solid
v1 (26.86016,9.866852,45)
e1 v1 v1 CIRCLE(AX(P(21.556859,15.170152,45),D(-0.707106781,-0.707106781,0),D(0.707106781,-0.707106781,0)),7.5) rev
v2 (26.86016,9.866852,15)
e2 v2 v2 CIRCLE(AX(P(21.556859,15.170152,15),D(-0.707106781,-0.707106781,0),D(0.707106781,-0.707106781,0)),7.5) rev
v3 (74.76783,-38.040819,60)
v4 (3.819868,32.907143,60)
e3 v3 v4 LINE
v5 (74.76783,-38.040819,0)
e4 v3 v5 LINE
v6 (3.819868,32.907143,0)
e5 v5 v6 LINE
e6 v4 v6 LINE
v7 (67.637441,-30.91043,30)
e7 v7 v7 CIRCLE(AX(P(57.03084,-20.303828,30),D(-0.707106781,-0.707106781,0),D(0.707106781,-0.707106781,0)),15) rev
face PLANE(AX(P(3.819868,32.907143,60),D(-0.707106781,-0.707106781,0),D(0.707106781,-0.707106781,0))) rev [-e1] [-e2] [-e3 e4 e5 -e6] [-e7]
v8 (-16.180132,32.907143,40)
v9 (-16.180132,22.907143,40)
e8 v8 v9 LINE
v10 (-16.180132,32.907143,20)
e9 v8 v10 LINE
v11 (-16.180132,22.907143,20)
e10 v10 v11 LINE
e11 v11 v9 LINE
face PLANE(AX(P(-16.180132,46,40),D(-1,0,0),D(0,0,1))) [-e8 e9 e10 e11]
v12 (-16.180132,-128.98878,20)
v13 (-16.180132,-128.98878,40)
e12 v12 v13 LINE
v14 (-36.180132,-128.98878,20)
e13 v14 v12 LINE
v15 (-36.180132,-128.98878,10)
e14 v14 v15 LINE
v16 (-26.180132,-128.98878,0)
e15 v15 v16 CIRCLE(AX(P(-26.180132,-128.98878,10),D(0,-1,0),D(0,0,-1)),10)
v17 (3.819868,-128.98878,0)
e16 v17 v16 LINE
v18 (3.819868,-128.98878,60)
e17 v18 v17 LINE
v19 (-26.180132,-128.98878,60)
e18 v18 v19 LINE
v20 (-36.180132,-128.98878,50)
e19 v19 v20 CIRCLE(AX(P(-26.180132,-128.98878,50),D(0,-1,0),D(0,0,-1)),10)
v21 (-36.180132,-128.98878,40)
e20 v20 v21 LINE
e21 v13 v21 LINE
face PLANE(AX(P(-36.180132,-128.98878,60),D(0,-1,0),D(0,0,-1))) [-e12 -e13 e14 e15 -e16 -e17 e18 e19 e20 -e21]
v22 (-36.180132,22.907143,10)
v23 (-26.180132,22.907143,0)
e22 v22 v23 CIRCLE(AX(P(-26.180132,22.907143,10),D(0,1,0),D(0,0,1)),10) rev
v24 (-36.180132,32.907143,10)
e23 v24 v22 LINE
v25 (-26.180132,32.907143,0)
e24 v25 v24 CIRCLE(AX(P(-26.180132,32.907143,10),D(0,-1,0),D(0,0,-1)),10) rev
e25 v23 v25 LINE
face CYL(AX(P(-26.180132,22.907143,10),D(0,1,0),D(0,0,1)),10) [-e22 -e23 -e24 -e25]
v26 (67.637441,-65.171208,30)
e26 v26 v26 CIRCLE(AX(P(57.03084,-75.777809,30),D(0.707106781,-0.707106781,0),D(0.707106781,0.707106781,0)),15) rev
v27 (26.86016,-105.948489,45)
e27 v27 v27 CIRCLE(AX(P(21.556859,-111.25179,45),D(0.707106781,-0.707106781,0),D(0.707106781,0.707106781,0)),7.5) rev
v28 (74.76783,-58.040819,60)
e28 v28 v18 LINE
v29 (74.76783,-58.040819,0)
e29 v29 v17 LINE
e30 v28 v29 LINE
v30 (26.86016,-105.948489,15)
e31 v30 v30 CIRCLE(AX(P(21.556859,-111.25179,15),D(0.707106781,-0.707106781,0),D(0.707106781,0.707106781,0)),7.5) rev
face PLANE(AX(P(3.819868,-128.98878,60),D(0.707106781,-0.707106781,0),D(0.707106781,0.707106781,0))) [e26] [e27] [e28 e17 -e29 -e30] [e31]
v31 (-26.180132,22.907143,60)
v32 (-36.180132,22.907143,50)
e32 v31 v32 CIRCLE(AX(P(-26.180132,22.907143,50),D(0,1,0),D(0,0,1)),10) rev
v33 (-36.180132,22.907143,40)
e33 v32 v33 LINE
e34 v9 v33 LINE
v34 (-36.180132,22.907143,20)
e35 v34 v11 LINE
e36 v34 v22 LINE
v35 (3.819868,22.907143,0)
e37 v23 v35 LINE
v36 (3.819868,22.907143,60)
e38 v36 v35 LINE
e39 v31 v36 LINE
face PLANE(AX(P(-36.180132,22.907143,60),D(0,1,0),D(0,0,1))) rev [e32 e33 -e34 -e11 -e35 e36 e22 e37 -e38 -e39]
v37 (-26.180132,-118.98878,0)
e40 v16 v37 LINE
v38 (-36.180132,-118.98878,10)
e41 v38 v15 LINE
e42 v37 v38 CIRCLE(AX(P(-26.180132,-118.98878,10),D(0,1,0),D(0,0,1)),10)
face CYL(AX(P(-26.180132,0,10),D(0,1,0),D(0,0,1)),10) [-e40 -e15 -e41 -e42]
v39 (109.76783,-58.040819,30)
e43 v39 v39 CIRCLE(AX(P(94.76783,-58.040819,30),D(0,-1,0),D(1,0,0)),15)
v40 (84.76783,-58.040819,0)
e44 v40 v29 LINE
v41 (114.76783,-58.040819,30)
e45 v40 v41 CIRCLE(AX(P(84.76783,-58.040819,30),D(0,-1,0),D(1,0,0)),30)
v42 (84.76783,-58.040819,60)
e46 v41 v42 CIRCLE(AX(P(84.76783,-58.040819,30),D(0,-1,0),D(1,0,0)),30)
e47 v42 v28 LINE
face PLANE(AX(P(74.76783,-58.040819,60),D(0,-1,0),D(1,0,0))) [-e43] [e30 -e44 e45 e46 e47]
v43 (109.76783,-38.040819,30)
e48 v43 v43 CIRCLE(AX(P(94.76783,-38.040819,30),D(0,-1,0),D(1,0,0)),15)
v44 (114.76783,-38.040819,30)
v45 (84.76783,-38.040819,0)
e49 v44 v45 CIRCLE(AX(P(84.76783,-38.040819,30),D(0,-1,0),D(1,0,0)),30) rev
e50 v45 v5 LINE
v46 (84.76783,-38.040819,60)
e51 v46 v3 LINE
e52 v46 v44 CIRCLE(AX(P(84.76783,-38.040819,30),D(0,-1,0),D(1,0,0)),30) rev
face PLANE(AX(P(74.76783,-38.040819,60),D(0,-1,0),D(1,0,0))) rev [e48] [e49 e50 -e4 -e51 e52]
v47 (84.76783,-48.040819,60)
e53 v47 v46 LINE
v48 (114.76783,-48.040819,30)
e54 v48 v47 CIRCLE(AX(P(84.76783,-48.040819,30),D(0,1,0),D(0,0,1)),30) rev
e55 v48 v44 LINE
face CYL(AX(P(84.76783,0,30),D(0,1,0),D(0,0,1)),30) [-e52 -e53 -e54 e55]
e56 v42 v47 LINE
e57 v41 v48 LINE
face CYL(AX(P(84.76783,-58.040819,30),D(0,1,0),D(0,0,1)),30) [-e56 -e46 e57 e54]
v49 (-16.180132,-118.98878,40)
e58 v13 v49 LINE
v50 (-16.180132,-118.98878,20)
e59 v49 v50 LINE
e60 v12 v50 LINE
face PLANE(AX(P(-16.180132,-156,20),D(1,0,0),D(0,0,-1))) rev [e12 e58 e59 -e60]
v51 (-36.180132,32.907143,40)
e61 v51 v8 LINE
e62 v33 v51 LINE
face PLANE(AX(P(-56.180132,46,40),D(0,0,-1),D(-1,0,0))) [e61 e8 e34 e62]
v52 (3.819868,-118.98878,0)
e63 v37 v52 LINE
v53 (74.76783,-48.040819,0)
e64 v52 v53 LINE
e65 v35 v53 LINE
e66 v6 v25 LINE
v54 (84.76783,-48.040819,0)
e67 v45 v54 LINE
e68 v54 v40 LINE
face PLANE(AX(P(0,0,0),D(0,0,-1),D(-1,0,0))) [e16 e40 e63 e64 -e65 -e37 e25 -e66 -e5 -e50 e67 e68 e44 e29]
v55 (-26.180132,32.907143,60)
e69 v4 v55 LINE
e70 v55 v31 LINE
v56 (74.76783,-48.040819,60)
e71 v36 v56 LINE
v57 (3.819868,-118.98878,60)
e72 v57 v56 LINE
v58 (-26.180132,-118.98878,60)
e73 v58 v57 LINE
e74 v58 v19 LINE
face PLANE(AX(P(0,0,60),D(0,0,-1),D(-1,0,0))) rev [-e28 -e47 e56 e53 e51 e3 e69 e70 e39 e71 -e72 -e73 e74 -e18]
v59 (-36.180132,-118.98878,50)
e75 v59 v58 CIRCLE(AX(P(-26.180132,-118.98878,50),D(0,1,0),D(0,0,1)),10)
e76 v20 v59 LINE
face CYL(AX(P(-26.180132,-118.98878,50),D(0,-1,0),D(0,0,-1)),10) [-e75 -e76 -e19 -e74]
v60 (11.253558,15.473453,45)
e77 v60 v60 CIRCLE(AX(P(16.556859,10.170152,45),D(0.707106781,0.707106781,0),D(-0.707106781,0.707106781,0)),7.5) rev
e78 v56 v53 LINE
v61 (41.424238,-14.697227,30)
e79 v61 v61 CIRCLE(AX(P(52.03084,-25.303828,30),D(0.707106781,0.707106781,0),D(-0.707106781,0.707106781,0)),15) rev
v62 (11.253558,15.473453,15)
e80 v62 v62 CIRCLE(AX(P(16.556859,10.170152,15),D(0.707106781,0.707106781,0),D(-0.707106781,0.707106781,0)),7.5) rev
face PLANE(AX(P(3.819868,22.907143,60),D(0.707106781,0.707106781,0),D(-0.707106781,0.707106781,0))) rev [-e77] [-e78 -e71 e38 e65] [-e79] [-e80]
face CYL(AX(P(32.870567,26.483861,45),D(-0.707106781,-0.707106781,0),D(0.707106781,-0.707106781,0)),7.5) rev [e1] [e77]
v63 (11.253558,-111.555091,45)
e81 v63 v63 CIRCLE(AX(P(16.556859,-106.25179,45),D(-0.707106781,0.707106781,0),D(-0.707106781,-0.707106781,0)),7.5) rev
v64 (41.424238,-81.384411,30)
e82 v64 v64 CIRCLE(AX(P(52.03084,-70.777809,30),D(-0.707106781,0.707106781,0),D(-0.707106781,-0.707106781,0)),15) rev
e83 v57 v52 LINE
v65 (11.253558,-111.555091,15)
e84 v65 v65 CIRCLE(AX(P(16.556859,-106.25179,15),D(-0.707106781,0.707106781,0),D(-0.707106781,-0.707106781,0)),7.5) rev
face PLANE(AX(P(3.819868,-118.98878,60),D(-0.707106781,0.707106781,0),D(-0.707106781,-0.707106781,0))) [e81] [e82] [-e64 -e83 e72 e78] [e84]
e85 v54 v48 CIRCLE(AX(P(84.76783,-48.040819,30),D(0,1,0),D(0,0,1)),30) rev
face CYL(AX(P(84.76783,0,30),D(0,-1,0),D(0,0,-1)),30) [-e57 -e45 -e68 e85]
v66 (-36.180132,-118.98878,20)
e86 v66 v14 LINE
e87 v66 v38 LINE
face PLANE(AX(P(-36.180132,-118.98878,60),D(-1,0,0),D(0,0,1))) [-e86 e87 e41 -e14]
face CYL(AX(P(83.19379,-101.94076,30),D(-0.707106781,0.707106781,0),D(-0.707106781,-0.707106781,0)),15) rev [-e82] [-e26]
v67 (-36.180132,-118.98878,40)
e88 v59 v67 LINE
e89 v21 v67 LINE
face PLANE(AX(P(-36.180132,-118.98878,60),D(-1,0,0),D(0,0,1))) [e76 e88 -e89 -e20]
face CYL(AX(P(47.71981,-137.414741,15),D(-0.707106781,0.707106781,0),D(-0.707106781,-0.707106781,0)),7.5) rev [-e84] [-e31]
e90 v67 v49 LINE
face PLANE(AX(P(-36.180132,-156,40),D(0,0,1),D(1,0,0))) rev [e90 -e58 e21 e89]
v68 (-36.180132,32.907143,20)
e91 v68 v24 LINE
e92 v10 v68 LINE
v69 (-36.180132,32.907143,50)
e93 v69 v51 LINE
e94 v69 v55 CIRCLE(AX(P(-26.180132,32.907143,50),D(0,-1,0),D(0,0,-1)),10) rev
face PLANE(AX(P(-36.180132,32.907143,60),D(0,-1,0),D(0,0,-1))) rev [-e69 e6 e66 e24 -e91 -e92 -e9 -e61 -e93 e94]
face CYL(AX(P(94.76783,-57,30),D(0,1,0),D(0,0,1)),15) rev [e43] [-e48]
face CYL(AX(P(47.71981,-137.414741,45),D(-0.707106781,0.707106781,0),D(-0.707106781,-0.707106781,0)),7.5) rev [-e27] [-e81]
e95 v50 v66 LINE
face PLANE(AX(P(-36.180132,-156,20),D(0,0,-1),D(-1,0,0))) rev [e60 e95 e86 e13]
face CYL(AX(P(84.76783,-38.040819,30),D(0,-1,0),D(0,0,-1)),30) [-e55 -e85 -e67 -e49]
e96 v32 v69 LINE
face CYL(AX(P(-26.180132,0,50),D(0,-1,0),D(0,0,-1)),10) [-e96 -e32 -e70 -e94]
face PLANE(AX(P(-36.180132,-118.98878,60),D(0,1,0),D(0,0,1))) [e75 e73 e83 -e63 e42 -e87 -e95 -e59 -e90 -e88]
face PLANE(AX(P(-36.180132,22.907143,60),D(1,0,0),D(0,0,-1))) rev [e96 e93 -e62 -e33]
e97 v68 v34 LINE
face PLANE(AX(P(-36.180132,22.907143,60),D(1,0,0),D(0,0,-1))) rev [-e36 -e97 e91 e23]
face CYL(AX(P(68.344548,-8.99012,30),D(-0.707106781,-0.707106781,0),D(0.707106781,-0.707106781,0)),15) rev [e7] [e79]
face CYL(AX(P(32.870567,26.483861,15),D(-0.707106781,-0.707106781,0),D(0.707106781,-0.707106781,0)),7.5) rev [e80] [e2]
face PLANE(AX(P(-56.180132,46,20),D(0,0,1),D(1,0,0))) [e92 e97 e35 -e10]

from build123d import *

# Parameters (mm, degrees)
SALIENTE_EXTRUIR1_DEPTH    = 60
CROQUIS3_W                 = 40
CROQUIS3_H                 = 20
CORTAR_EXTRUIR1_DEPTH      = 46
CROQUIS4_R                 = 15
CORTAR_EXTRUIR5_DEPTH      = 57
CORTAR_EXTRUIR6_DEPTH      = 16
CORTAR_EXTRUIR6_DEPTH_BACK = 19
CROQUIS12_R                = 7.5
CROQUIS12_R_2              = 15
REDONDEO2_R                = 10
REDONDEO3_R                = 30
CROQUIS13_R                = 15
CORTAR_EXTRUIR7_DEPTH      = 82
REDONDEO4_R                = 30
CROQUIS14_W                = 20
CROQUIS14_H                = 20
CORTAR_EXTRUIR8_DEPTH      = 156
CORTAR_EXTRUIR9_DEPTH      = 37
CORTAR_EXTRUIR9_DEPTH_BACK = 54
CROQUIS16_R                = 7.5
CROQUIS16_R_2              = 15
REDONDEO5_R                = 10


with BuildPart() as part:
    # Croquis2 → Saliente-Extruir1 (new body)
    with BuildSketch(Plane.XY):
        Polygon((-36.180131723, 22.907142857), (3.819868277, 22.907142857), (74.767829948, -48.040818814), (114.767829948, -48.040818814), (114.767829948, -38.040818814), (74.767829948, -38.040818814), (3.819868277, 32.907142857), (-36.180131723, 32.907142857), align=None)
    saliente_extruir1 = extrude(amount=SALIENTE_EXTRUIR1_DEPTH)

    # Croquis3 → Cortar-Extruir1 (cut)
    with BuildSketch(Plane(origin=(0, 0, 0), x_dir=(1, 0, 0), z_dir=(0, 1, 0))):
        with Locations((-36.180131723, -30)):
            Rectangle(CROQUIS3_W, CROQUIS3_H)
    extrude(amount=CORTAR_EXTRUIR1_DEPTH, mode=Mode.SUBTRACT)

    # Croquis4 → Cortar-Extruir5 (cut)
    with BuildSketch(Plane(origin=(0, 0, 0), x_dir=(1, 0, 0), z_dir=(0, 1, 0))):
        with Locations(Location((94.767829948, -30, 0), (0, 0, 270))):
            Circle(CROQUIS4_R)
    extrude(amount=-CORTAR_EXTRUIR5_DEPTH, mode=Mode.SUBTRACT)

    # Croquis12 → Cortar-Extruir6 (cut, two sides: drawn at the far end of the back side and taken through both)
    with BuildSketch(Plane(origin=(18.363505567, 18.363505567, 0), x_dir=(0, 0, -1), z_dir=(0.7071067811865486, 0.7071067811865465, 0)).offset(-CORTAR_EXTRUIR6_DEPTH_BACK)):
        with Locations(Location((-15, -4.516083302, 0), (0, 0, 270))):
            Circle(CROQUIS12_R)
        with Locations(Location((-45, -4.516083302, 0), (0, 0, 270))):
            Circle(CROQUIS12_R)
        with Locations(Location((-30, -54.683868112, 0), (0, 0, 270))):
            Circle(CROQUIS12_R_2)
    extrude(amount=CORTAR_EXTRUIR6_DEPTH + CORTAR_EXTRUIR6_DEPTH_BACK, mode=Mode.SUBTRACT)

    # Redondeo2
    redondeo2_edges = [part.edges().sort_by_distance(p)[0] for p in [
        (-36.180131723, 27.907142857, 0),
        (-36.180131723, 27.907142857, 60),
    ]]
    fillet(redondeo2_edges, radius=REDONDEO2_R)

    # Redondeo3
    redondeo3_edges = [part.edges().sort_by_distance(p)[0] for p in [
        (114.767829948, -43.040818814, 60),
        (114.767829948, -43.040818814, 0),
    ]]
    fillet(redondeo3_edges, radius=REDONDEO3_R - 0.0001)  # a hair under: the kernel refuses the full size

    # Simetría1: Saliente-Extruir1 across plane
    add(saliente_extruir1.mirror(Plane(origin=(114.767829948, -48.040818814, 60), x_dir=(0, 0, 1), z_dir=(0, 1, 0))))

    # Croquis13 → Cortar-Extruir7 (cut)
    with BuildSketch(Plane(origin=(0, 0, 0), x_dir=(1, 0, 0), z_dir=(0, 1, 0))):
        with Locations((94.767829948, -30)):
            Circle(CROQUIS13_R)
    extrude(amount=-CORTAR_EXTRUIR7_DEPTH, mode=Mode.SUBTRACT)

    # Redondeo4
    redondeo4_edges = [part.edges().sort_by_distance(p)[0] for p in [
        (114.767829948, -53.040818814, 0),
        (114.767829948, -53.040818814, 60),
    ]]
    fillet(redondeo4_edges, radius=REDONDEO4_R - 0.0001)  # a hair under: the kernel refuses the full size

    # Croquis14 → Cortar-Extruir8 (cut)
    with BuildSketch(Plane(origin=(0, 0, 0), x_dir=(1, 0, 0), z_dir=(0, 1, 0))):
        with Locations((-26.180131723, -30)):
            Rectangle(CROQUIS14_W, CROQUIS14_H)
    extrude(amount=-CORTAR_EXTRUIR8_DEPTH, mode=Mode.SUBTRACT)

    # Croquis16 → Cortar-Extruir9 (cut, two sides: drawn at the far end of the back side and taken through both)
    with BuildSketch(Plane(origin=(66.404324381, -66.404324381, 0), x_dir=(0, 0, -1), z_dir=(0.7071067811865486, -0.7071067811865465, 0)).offset(-CORTAR_EXTRUIR9_DEPTH_BACK)):
        with Locations(Location((-45, -63.423894212, 0), (0, 0, 270))):
            Circle(CROQUIS16_R)
        with Locations(Location((-15, -63.423894212, 0), (0, 0, 270))):
            Circle(CROQUIS16_R)
        with Locations(Location((-30, -13.256109403, 0), (0, 0, 270))):
            Circle(CROQUIS16_R_2)
    extrude(amount=CORTAR_EXTRUIR9_DEPTH + CORTAR_EXTRUIR9_DEPTH_BACK, mode=Mode.SUBTRACT)

    # Redondeo5
    redondeo5_edges = [part.edges().sort_by_distance(p)[0] for p in [
        (-36.180131723, -123.988780485, 60),
        (-36.180131723, -123.988780485, 0),
    ]]
    fillet(redondeo5_edges, radius=REDONDEO5_R)


solid = part.part
